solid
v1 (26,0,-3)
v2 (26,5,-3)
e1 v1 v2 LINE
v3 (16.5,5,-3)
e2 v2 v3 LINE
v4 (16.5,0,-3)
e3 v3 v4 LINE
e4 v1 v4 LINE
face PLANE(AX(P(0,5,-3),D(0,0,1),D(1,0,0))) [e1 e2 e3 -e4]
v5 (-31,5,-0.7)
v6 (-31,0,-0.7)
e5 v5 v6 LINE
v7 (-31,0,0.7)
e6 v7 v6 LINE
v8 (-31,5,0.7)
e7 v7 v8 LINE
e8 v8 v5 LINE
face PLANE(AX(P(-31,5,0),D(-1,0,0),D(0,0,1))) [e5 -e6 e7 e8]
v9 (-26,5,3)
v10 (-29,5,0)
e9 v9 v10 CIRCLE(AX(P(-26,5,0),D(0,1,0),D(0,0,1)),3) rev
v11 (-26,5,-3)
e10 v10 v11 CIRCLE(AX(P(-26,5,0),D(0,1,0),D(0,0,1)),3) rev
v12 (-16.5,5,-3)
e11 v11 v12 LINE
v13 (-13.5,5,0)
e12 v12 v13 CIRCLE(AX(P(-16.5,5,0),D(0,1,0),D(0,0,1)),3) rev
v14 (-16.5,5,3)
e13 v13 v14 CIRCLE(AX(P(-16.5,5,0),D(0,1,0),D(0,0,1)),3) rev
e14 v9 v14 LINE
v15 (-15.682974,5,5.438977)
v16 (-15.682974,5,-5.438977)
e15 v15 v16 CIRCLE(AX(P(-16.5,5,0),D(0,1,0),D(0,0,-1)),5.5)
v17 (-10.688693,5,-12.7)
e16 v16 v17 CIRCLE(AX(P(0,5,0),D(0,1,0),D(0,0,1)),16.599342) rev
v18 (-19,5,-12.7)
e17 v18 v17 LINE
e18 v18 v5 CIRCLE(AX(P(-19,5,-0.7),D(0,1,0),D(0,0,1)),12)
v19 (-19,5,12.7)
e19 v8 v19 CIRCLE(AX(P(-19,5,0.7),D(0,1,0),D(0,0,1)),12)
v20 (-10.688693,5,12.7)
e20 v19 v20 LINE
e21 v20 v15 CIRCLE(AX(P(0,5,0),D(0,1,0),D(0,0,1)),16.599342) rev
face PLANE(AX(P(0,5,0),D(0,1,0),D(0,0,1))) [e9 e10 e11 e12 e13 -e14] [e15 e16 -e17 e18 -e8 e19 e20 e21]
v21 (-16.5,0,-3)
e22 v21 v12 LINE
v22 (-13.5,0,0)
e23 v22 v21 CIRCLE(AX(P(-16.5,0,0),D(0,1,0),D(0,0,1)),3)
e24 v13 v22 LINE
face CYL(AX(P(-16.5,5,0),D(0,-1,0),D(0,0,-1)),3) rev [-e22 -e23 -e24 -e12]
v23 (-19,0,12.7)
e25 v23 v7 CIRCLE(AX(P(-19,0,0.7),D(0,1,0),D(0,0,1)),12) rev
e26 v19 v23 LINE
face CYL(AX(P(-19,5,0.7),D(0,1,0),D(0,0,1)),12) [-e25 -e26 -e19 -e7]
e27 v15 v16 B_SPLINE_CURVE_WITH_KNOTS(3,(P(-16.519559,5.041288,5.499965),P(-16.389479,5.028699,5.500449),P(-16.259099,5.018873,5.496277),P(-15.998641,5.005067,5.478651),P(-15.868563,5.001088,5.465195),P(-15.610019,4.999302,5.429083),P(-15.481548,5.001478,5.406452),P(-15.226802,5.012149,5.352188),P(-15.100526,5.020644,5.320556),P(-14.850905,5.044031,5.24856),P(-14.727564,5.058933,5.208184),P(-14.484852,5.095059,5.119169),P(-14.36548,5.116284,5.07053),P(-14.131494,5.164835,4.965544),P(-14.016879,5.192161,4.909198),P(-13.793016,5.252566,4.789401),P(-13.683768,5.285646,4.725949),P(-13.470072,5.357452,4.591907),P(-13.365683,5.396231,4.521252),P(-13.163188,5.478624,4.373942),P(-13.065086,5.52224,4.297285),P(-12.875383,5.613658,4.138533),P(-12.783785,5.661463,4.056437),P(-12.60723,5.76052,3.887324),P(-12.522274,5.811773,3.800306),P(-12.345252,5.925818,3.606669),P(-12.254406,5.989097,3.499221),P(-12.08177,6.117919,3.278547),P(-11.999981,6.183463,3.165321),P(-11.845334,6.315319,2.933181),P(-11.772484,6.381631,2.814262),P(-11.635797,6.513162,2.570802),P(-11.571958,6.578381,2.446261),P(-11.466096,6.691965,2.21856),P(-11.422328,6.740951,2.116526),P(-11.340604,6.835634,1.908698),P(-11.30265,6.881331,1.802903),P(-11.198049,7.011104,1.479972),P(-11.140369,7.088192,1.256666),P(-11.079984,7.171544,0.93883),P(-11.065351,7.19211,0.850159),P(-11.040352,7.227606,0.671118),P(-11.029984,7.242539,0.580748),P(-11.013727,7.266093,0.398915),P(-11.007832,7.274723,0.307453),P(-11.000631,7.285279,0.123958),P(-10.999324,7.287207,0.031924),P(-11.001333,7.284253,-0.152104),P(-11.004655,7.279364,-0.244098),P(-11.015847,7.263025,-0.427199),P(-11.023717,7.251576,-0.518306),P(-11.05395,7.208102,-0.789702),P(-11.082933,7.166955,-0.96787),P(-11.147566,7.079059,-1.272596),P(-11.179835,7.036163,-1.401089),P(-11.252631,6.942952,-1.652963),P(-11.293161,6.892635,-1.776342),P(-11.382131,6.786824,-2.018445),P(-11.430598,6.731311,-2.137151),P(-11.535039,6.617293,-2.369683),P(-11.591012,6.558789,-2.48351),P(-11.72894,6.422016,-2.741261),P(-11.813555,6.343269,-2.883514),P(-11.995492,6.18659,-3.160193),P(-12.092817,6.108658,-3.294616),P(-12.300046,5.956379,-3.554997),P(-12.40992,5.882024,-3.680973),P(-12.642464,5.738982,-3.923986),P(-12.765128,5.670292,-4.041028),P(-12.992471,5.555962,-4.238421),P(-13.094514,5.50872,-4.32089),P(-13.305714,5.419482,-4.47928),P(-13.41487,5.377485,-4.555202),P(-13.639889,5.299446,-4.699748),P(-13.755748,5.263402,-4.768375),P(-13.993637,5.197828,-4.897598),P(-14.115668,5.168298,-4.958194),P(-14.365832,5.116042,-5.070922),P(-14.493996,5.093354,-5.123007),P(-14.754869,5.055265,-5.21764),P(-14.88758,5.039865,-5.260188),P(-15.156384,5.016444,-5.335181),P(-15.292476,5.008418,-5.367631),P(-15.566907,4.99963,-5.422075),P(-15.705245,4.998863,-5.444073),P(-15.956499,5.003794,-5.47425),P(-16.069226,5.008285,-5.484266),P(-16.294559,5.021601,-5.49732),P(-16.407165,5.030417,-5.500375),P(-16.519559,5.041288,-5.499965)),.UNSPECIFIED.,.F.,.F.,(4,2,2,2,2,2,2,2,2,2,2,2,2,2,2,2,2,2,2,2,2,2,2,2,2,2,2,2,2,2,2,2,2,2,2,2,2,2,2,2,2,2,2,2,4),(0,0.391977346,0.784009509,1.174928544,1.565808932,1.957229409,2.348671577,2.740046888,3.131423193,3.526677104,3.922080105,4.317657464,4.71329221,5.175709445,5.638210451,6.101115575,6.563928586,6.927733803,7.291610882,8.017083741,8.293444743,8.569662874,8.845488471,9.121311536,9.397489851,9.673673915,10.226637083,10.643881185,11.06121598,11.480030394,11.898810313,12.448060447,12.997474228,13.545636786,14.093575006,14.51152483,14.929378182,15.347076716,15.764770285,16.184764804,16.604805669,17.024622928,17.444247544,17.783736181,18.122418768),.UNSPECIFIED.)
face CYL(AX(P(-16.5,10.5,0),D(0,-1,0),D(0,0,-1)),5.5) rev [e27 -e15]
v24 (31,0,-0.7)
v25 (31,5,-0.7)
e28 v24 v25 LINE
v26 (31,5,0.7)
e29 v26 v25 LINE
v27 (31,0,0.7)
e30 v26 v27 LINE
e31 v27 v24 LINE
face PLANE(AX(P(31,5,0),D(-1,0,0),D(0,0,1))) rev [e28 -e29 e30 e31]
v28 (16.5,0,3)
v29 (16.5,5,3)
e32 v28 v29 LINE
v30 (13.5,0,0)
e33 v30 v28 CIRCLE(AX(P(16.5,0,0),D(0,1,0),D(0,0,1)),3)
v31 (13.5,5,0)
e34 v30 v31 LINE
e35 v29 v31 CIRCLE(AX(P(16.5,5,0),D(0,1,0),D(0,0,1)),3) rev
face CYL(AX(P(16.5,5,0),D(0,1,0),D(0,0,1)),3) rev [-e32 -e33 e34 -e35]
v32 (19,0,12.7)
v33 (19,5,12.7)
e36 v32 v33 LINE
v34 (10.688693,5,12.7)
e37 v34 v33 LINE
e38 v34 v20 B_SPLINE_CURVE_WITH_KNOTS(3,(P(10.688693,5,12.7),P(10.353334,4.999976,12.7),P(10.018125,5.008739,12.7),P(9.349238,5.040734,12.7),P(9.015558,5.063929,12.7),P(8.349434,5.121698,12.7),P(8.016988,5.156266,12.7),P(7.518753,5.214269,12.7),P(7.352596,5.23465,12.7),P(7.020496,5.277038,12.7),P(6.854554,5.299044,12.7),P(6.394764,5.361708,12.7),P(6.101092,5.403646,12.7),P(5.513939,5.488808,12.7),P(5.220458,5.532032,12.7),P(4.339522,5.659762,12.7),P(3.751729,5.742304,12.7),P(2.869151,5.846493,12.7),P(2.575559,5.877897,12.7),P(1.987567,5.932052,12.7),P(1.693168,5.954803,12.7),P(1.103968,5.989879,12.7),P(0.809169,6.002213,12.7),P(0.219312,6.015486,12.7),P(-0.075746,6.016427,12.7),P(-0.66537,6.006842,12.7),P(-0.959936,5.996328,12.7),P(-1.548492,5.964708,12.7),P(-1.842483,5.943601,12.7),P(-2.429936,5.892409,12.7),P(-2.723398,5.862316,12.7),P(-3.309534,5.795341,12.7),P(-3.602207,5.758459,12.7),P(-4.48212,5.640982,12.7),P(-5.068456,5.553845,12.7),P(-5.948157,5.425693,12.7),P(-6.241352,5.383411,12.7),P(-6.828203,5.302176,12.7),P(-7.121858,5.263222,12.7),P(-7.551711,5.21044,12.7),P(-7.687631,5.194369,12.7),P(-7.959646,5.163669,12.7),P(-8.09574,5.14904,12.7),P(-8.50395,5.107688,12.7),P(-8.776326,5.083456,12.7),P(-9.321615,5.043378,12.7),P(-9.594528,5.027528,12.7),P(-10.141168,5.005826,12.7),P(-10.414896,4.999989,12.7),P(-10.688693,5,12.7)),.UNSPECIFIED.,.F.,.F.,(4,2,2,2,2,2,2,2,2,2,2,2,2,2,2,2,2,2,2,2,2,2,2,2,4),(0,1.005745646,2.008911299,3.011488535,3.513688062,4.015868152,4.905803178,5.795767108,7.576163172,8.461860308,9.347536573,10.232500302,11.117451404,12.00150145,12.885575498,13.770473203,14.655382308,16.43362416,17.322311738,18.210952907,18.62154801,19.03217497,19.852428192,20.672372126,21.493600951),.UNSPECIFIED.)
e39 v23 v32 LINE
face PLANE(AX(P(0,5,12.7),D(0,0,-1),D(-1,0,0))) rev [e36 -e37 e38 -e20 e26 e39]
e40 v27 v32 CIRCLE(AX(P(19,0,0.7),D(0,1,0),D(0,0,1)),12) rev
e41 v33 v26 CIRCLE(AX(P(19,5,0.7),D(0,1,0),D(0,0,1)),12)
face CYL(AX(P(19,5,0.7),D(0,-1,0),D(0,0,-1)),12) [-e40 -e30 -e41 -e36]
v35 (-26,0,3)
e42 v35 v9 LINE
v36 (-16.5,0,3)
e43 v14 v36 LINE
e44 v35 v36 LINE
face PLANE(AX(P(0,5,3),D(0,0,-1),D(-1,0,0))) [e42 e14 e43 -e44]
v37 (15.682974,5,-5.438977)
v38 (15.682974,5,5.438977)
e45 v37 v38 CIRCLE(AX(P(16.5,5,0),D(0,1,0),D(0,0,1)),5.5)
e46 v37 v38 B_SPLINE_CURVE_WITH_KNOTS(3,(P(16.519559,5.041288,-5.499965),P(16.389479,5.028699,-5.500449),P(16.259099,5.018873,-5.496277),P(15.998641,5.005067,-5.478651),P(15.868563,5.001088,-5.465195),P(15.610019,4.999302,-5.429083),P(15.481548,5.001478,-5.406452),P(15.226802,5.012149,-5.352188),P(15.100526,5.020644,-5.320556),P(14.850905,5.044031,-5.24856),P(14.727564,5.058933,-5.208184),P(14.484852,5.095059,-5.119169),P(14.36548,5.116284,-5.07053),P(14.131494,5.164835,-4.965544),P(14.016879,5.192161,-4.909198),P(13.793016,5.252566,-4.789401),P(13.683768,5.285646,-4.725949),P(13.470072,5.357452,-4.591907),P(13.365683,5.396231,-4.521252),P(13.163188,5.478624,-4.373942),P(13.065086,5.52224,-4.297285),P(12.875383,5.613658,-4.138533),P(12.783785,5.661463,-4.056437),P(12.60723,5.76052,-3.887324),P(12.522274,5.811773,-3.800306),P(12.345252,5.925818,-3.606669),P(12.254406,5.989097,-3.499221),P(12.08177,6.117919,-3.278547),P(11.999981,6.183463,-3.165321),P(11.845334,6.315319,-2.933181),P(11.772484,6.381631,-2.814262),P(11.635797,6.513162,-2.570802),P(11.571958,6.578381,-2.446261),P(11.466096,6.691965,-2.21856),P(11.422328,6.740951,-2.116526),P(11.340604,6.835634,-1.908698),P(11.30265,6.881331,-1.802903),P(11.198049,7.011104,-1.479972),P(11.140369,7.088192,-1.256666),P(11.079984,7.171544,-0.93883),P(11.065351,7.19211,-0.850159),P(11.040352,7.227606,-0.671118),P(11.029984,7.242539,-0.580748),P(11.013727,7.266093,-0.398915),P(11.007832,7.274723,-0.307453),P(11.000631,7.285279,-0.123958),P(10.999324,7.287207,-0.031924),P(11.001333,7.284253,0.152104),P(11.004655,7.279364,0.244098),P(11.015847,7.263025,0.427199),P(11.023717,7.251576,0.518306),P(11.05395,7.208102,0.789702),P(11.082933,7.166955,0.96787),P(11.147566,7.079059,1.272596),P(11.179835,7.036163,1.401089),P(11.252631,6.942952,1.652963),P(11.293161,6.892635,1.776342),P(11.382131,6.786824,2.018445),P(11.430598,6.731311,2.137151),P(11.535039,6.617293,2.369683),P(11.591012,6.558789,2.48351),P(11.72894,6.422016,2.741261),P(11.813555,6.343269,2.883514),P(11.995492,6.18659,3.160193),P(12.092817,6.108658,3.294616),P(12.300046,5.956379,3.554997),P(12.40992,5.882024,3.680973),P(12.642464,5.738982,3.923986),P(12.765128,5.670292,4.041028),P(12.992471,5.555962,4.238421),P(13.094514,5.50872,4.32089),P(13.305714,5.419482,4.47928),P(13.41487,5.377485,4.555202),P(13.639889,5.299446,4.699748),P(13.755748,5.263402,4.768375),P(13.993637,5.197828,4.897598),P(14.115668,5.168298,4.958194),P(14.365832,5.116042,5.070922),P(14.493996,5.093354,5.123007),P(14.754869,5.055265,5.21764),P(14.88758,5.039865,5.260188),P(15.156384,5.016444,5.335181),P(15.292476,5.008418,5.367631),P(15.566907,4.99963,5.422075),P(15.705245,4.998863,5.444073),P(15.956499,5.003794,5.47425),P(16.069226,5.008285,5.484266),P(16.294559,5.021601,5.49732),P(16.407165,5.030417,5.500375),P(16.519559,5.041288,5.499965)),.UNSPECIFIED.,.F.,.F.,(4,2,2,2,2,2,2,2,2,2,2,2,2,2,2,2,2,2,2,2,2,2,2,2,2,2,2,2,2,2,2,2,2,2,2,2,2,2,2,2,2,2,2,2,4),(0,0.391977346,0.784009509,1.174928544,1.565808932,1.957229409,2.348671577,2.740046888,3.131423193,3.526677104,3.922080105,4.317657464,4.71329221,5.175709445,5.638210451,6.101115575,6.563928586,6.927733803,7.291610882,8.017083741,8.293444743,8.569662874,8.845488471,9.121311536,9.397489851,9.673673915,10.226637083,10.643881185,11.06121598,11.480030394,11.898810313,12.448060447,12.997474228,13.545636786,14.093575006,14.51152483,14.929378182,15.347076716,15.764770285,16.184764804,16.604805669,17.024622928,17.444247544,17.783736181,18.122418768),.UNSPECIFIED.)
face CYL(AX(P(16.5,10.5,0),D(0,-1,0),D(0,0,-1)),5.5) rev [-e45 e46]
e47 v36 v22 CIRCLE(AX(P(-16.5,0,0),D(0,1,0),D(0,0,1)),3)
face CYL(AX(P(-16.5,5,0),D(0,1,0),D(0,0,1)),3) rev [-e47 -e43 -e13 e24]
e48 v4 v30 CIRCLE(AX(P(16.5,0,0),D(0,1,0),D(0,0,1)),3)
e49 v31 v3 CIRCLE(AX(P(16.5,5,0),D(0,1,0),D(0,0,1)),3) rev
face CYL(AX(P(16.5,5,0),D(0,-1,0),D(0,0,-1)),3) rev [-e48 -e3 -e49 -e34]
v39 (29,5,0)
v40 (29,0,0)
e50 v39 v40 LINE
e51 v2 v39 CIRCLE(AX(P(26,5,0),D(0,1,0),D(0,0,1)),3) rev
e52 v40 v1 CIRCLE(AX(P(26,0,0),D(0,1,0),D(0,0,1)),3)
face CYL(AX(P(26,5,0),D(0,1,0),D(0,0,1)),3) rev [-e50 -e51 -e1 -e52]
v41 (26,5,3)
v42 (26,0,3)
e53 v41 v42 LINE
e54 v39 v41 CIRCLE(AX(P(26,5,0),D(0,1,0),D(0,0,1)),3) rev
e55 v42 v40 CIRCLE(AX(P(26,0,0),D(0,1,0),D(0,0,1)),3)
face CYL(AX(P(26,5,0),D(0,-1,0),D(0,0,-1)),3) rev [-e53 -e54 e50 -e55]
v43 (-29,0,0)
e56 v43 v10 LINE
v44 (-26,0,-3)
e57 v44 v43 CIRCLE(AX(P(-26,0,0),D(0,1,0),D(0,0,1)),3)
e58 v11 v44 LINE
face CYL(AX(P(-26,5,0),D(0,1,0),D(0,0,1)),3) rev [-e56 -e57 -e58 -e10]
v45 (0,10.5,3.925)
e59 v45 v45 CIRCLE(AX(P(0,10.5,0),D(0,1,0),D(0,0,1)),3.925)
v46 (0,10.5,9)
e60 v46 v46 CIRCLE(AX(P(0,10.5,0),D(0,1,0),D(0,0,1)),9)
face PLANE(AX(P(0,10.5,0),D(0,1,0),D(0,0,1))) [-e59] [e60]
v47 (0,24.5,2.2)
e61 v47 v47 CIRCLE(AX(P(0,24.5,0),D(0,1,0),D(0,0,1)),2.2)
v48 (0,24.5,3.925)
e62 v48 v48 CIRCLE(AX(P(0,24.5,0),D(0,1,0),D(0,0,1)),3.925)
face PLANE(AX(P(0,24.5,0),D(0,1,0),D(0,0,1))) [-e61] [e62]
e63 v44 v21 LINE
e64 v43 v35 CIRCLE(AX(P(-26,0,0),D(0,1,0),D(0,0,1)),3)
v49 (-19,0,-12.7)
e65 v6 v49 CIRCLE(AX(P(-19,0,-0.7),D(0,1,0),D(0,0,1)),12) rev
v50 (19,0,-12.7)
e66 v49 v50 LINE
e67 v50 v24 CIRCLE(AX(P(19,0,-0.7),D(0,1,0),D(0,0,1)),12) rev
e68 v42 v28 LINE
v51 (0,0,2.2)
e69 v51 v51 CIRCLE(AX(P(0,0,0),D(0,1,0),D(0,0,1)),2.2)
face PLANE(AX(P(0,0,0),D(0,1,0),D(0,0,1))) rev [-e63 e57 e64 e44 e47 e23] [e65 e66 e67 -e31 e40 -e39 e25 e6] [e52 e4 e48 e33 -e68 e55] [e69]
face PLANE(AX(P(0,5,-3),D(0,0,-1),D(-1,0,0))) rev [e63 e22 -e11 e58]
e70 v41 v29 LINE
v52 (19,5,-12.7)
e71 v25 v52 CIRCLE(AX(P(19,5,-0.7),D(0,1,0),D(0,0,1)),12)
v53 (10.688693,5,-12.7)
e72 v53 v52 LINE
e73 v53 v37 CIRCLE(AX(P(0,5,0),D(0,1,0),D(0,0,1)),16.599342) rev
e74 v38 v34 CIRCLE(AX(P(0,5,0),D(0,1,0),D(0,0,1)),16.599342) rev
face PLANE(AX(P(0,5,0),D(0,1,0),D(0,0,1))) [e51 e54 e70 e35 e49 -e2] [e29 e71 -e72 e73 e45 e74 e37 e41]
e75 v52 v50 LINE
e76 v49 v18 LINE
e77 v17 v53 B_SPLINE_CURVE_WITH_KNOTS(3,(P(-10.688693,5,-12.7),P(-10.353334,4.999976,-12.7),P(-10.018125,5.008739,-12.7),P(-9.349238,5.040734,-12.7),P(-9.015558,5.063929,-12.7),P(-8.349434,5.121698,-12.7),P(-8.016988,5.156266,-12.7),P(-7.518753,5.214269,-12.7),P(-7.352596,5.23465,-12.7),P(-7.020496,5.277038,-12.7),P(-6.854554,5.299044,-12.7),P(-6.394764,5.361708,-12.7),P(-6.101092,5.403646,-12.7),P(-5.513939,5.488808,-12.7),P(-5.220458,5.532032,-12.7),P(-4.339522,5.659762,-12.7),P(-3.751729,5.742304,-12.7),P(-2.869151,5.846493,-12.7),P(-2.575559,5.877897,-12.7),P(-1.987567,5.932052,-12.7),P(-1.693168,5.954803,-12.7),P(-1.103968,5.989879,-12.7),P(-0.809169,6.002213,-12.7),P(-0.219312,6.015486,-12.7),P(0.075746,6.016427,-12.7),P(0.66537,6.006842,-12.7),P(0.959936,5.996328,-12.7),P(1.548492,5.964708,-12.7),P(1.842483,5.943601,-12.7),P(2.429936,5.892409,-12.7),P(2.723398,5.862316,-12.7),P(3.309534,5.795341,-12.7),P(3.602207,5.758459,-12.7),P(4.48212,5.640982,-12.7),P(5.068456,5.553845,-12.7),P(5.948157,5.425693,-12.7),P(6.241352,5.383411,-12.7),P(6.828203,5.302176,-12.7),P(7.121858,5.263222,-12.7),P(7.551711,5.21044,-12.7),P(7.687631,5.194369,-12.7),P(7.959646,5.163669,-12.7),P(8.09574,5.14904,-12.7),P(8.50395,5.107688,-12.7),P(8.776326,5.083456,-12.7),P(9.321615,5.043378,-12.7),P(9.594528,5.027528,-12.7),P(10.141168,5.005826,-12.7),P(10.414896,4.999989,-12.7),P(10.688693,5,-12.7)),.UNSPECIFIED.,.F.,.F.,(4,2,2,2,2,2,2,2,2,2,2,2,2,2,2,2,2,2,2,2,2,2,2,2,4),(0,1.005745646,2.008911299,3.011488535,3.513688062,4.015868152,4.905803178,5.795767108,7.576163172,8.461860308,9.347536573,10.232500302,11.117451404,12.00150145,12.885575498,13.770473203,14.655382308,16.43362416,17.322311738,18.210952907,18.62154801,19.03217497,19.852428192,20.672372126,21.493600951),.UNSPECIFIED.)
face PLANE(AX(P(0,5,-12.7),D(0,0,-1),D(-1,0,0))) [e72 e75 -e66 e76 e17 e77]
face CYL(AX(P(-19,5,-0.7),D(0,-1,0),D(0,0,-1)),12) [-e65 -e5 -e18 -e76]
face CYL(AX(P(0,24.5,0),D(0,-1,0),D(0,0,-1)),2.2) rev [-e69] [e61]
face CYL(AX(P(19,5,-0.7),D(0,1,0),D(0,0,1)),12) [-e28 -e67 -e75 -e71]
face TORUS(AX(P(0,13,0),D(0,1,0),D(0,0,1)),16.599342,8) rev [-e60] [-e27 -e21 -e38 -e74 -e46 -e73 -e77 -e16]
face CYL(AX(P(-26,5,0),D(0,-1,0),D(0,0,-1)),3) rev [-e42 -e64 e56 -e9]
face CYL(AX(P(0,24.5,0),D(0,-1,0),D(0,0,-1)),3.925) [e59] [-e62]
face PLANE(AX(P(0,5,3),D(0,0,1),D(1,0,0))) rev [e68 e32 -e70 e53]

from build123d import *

# Parameters (mm, degrees)
SKETCH1_W           = 62
SKETCH1_H           = 25.4
SKETCH1_R           = 3.925
SKETCH1_W_2         = 15.5
SKETCH1_H_2         = 6
BOSS_EXTRUDE1_DEPTH = 5
SKETCH1_3_R         = 3.925
SKETCH1_3_R_2       = 2.2
BOSS_EXTRUDE2_DEPTH = 24.5
FILLET1_R           = 3
SKETCH2_R           = 9
BOSS_EXTRUDE3_DEPTH = 5.5
FILLET2_R           = 8
SKETCH3_R           = 5.5
CUT_EXTRUDE1_DEPTH  = 5.5
FILLET3_R           = 12
SKETCH4_R           = 2.2
CUT_EXTRUDE2_DEPTH  = 42.503493918


# Some blends are built 0.0001 mm under size
with BuildPart() as part:
    # Sketch1 → Boss-Extrude1 (new body)
    with BuildSketch(Plane(origin=(0, 0, 0), x_dir=(1, 0, 0), z_dir=(0, 1, 0))):
        Rectangle(SKETCH1_W, SKETCH1_H)
        with Locations(Location((0, 0, 0), (0, 0, 270))):
            Circle(SKETCH1_R, mode=Mode.SUBTRACT)
        with Locations((-21.25, 0)):
            Rectangle(SKETCH1_W_2, SKETCH1_H_2, mode=Mode.SUBTRACT)
        with Locations((21.25, 0)):
            Rectangle(SKETCH1_W_2, SKETCH1_H_2, mode=Mode.SUBTRACT)
    extrude(amount=BOSS_EXTRUDE1_DEPTH)

    # Sketch1<3> → Boss-Extrude2 (add)
    with BuildSketch(Plane(origin=(0, 0, 0), x_dir=(1, 0, 0), z_dir=(0, 1, 0))):
        with Locations(Location((0, 0, 0), (0, 0, 270))):
            Circle(SKETCH1_3_R)
        with Locations(Location((0, 0, 0), (0, 0, 270))):
            Circle(SKETCH1_3_R_2, mode=Mode.SUBTRACT)
    extrude(amount=BOSS_EXTRUDE2_DEPTH)

    # Fillet1
    fillet1_edges = [part.edges().sort_by_distance(p)[0] for p in [
        (29, 2.5, 3),
        (13.5, 2.5, 3),
        (29, 2.5, -3),
        (13.5, 2.5, -3),
        (-29, 2.5, 3),
        (-29, 2.5, -3),
        (-13.5, 2.5, 3),
        (-13.5, 2.5, -3),
    ]]
    fillet(fillet1_edges, radius=FILLET1_R - 0.0001)  # a hair under: the kernel refuses the full size

    # Sketch2 → Boss-Extrude3 (add)
    with BuildSketch(Plane(origin=(0, 5, 0), x_dir=(1, 0, 0), z_dir=(0, 1, 0))):
        with Locations(Location((0, 0, 0), (0, 0, 270))):
            Circle(SKETCH2_R)
    extrude(amount=BOSS_EXTRUDE3_DEPTH)

    # Fillet2
    # the kernel refuses this fillet: 8 mm, written as the material it adds along each edge
    with BuildSketch(Plane(origin=(0, 5, 0), x_dir=(0, 0, 1), z_dir=(-1, 0, 0))) as fillet2_piece_1_section:
        with BuildLine():
            CenterArc((16.599342077, 8), FILLET2_R, 198.209956864, 71.790043136)
            Line((9, 5.5), (9, 0))
            Line((9, 0), (16.599342077, 0))
        make_face()
    fillet2_piece_1 = revolve(axis=Axis((0, 5, 0), (0, 1, 0)), mode=Mode.PRIVATE)
    fillet2_piece_1 = fillet2_piece_1 - Plane(origin=(-16.4999, 5, -0.0001), x_dir=(0, 0, -1), z_dir=(0, 1, 0)) * Cylinder(2.9999, 67, mode=Mode.PRIVATE)
    fillet2_piece_1 = split(fillet2_piece_1, bisect_by=Plane(origin=(0, 5, 12.7), z_dir=(0, 0, -1)), keep=Keep.TOP, mode=Mode.PRIVATE)
    fillet2_piece_1 = split(fillet2_piece_1, bisect_by=Plane(origin=(0, 5, -12.7), z_dir=(0, 0, 1)), keep=Keep.TOP, mode=Mode.PRIVATE)
    fillet2_piece_1 = fillet2_piece_1 - Plane(origin=(16.4999, 5, 0.0001), x_dir=(0, 0, 1), z_dir=(0, 1, 0)) * Cylinder(2.9999, 67, mode=Mode.PRIVATE)
    add(fillet2_piece_1)

    # Sketch3 → Cut-Extrude1 (cut)
    with BuildSketch(Plane(origin=(0, 5, 0), x_dir=(1, 0, 0), z_dir=(0, 1, 0))):
        with Locations((16.5, 0)):
            Circle(SKETCH3_R)
        with Locations((-16.5, 0)):
            Circle(SKETCH3_R)
    extrude(amount=CUT_EXTRUDE1_DEPTH, mode=Mode.SUBTRACT)

    # Fillet3
    fillet3_edges = [part.edges().sort_by_distance(p)[0] for p in [
        (-31, 2.5, 12.7),
        (-31, 2.5, -12.7),
        (31, 2.5, -12.7),
        (31, 2.5, 12.7),
    ]]
    fillet(fillet3_edges, radius=FILLET3_R)

    # Sketch4 → Cut-Extrude2 (cut, through all)
    with BuildSketch(Plane(origin=(0, 24.5, 0), x_dir=(1, 0, 0), z_dir=(0, 1, 0))):
        with Locations(Location((0, 0, 0), (0, 0, 270))):
            Circle(SKETCH4_R)
    extrude(amount=-CUT_EXTRUDE2_DEPTH, mode=Mode.SUBTRACT)


solid = part.part
